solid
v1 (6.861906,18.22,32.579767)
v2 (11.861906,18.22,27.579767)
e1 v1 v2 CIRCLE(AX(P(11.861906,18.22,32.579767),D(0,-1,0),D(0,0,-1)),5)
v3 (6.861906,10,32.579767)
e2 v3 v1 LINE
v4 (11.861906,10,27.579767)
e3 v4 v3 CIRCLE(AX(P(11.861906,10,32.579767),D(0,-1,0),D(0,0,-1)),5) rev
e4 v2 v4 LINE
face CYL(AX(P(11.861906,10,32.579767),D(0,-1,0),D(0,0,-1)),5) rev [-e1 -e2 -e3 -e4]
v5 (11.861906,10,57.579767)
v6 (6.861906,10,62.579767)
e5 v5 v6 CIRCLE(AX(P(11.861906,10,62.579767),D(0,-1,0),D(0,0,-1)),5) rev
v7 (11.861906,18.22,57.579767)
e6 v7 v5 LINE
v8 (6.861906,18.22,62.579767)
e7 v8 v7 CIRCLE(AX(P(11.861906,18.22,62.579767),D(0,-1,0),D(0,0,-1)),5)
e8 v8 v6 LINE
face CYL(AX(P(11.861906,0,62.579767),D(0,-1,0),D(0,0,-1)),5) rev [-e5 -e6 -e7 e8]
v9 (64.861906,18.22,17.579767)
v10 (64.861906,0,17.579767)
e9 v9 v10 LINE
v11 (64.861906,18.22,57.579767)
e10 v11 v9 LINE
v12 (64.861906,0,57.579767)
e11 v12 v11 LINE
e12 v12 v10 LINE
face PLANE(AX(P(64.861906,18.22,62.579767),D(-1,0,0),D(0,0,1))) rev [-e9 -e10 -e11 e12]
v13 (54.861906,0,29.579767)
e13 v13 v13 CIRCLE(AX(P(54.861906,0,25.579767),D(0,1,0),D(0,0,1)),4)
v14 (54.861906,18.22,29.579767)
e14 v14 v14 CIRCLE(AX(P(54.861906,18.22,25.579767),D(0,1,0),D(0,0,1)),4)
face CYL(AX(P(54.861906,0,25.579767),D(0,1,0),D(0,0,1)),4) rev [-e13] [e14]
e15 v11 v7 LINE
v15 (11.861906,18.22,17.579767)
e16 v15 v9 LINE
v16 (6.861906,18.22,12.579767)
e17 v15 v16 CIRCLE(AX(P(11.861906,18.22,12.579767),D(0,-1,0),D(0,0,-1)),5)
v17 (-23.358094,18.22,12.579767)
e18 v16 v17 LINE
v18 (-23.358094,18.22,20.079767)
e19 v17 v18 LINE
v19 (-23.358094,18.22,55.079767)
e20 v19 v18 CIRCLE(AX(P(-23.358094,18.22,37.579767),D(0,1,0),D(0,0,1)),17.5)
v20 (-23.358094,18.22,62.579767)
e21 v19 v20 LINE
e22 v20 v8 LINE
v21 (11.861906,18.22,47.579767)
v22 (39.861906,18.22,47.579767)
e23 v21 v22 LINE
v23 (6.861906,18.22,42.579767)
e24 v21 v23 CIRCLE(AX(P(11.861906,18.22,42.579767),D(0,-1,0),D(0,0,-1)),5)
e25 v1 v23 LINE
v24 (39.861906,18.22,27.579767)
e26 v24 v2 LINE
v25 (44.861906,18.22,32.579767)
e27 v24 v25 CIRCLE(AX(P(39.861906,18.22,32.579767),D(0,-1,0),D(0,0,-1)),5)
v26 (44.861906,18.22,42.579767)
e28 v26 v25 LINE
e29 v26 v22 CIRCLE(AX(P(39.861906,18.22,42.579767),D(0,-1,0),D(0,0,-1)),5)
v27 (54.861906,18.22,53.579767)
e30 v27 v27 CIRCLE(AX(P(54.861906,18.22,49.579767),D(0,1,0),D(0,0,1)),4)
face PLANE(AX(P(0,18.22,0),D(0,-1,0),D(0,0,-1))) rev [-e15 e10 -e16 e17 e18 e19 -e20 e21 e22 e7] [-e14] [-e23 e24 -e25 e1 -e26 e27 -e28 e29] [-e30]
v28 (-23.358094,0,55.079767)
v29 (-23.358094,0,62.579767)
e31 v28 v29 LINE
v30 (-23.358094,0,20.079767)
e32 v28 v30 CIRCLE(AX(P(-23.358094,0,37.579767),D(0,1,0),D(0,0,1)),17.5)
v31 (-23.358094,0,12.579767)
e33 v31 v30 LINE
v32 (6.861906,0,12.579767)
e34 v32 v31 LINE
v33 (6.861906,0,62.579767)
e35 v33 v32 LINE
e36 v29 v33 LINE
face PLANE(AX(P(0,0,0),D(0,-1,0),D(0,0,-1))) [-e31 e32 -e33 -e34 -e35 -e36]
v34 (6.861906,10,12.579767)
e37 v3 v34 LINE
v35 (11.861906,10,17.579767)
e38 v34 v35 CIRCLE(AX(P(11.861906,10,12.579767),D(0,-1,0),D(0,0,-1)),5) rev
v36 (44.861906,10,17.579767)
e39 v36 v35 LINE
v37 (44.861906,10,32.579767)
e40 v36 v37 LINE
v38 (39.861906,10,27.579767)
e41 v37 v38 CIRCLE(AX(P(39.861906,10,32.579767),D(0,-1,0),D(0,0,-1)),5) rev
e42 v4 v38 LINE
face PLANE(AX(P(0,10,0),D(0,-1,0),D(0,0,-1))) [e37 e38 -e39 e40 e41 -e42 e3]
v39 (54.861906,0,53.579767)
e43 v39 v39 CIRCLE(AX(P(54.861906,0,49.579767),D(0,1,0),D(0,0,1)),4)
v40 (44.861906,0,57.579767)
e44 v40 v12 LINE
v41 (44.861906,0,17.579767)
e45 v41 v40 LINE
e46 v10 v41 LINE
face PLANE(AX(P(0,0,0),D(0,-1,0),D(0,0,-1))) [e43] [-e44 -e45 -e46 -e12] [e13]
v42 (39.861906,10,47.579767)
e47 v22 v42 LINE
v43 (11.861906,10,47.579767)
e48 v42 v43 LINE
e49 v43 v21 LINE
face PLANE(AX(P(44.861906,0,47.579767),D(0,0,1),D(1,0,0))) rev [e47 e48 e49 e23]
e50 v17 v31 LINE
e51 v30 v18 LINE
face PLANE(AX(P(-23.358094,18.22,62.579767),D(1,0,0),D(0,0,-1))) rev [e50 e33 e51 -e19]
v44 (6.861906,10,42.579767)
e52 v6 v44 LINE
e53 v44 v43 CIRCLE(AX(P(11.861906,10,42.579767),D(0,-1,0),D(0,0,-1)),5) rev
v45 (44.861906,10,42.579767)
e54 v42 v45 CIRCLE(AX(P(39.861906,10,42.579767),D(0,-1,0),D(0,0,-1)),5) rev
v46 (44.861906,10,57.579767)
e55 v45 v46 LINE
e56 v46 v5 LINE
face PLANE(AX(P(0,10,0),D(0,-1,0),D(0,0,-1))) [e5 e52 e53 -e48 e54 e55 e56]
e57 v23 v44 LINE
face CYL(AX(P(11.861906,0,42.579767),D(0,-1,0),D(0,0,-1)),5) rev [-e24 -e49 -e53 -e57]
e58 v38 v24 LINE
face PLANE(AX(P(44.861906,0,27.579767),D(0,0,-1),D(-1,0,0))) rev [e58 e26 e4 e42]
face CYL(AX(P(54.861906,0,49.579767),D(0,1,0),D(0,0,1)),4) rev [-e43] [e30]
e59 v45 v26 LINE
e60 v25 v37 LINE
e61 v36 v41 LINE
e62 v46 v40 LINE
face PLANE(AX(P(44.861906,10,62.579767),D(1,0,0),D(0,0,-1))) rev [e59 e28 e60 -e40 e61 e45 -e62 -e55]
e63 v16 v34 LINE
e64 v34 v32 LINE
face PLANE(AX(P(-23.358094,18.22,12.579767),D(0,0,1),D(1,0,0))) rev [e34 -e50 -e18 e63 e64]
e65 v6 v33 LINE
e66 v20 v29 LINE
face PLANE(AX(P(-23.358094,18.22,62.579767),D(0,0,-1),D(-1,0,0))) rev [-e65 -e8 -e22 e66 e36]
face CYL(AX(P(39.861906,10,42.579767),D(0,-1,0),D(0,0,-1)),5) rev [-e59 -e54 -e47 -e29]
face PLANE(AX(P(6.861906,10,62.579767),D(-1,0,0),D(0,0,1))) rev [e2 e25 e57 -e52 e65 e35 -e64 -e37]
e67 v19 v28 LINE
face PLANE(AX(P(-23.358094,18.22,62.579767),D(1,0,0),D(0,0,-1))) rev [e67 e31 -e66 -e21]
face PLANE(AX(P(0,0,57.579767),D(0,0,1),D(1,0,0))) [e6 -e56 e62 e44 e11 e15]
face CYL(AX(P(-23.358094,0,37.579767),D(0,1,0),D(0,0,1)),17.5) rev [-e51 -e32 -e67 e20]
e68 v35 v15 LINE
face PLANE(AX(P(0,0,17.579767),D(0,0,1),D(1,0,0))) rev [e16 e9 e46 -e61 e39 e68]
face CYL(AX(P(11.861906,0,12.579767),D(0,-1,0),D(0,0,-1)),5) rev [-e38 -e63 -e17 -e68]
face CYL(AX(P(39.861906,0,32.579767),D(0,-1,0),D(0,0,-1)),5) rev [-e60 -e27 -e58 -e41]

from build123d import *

# Parameters (mm, degrees)
ESQUISSE1_W             = 88.22
ESQUISSE1_H             = 50
BOSS_EXTRU_2_DEPTH      = 18.22
ESQUISSE3_W             = 38
ESQUISSE3_H             = 50
ENL_V_MAT_EXTRU_1_DEPTH = 10
ESQUISSE6_W             = 58
ESQUISSE6_H             = 18.22
ENL_V_MAT_EXTRU_2_DEPTH = 5
ESQUISSE7_W             = 58
ESQUISSE7_H             = 18.22
ENL_V_MAT_EXTRU_3_DEPTH = 5
CONG_6_R                = 5
CONG_11_R               = 5
ESQUISSE8_R             = 17.5
ENL_V_MAT_EXTRU_4_DEPTH = 92.952500984
ESQUISSE10_W            = 38
ESQUISSE10_H            = 20
ENL_V_MAT_EXTRU_5_DEPTH = 92.952500984
CONG_7_R                = 5
CONG_8_R                = 5
CONG_9_R                = 5
CONG_10_R               = 5
ESQUISSE11_R            = 4
ENL_V_MAT_EXTRU_6_DEPTH = 92.952500984


with BuildPart() as part:
    # Esquisse1 → Boss.-Extru.2 (new body)
    with BuildSketch(Plane(origin=(0, 0, 0), x_dir=(1, 0, 0), z_dir=(0, 1, 0))):
        with Locations((20.751905501, -37.579767114)):
            Rectangle(ESQUISSE1_W, ESQUISSE1_H)
    extrude(amount=BOSS_EXTRU_2_DEPTH)

    # Esquisse3 → Enlèv. mat.-Extru.1 (cut)
    with BuildSketch(Plane(origin=(0, 0, 0), x_dir=(-1, 0, 0), z_dir=(0, -1, 0))):
        with Locations((-25.861905501, -37.579767114)):
            Rectangle(ESQUISSE3_W, ESQUISSE3_H)
    extrude(amount=-ENL_V_MAT_EXTRU_1_DEPTH, mode=Mode.SUBTRACT)

    # Esquisse6 → Enlèv. mat.-Extru.2 (cut)
    with BuildSketch(Plane.XY.offset(62.579767114)):
        with Locations((35.861905501, 9.11)):
            Rectangle(ESQUISSE6_W, ESQUISSE6_H)
    extrude(amount=-ENL_V_MAT_EXTRU_2_DEPTH, mode=Mode.SUBTRACT)

    # Esquisse7 → Enlèv. mat.-Extru.3 (cut)
    with BuildSketch(Plane(origin=(0, 0, 12.579767114), x_dir=(-1, 0, 0), z_dir=(0, 0, -1))):
        with Locations((-35.861905501, 9.11)):
            Rectangle(ESQUISSE7_W, ESQUISSE7_H)
    extrude(amount=-ENL_V_MAT_EXTRU_3_DEPTH, mode=Mode.SUBTRACT)

    # Congé6
    cong_6_edges = [part.edges().sort_by_distance(p)[0] for p in [
        (6.861905501, 14.11, 17.579767114),
    ]]
    fillet(cong_6_edges, radius=CONG_6_R - 0.0001)  # a hair under: the kernel refuses the full size

    # Congé11
    cong_11_edges = [part.edges().sort_by_distance(p)[0] for p in [
        (6.861905501, 14.11, 57.579767114),
    ]]
    fillet(cong_11_edges, radius=CONG_11_R - 0.0001)  # a hair under: the kernel refuses the full size

    # Esquisse8 → Enlèv. mat.-Extru.4 (cut, through all)
    with BuildSketch(Plane(origin=(0, 18.22, 0), x_dir=(1, 0, 0), z_dir=(0, 1, 0))):
        with Locations((-23.358094499, -37.579767114)):
            Circle(ESQUISSE8_R)
    extrude(amount=-ENL_V_MAT_EXTRU_4_DEPTH, mode=Mode.SUBTRACT)

    # Esquisse10 → Enlèv. mat.-Extru.5 (cut, through all)
    with BuildSketch(Plane(origin=(0, 18.22, 0), x_dir=(1, 0, 0), z_dir=(0, 1, 0))):
        with Locations((25.861905501, -37.579767114)):
            Rectangle(ESQUISSE10_W, ESQUISSE10_H)
    extrude(amount=-ENL_V_MAT_EXTRU_5_DEPTH, mode=Mode.SUBTRACT)

    # Congé7
    cong_7_edges = [part.edges().sort_by_distance(p)[0] for p in [
        (6.861905501, 14.11, 27.579767114),
    ]]
    fillet(cong_7_edges, radius=CONG_7_R)

    # Congé8
    cong_8_edges = [part.edges().sort_by_distance(p)[0] for p in [
        (6.861905501, 14.11, 47.579767114),
    ]]
    fillet(cong_8_edges, radius=CONG_8_R)

    # Congé9
    cong_9_edges = [part.edges().sort_by_distance(p)[0] for p in [
        (44.861905501, 14.11, 27.579767114),
    ]]
    fillet(cong_9_edges, radius=CONG_9_R)

    # Congé10
    cong_10_edges = [part.edges().sort_by_distance(p)[0] for p in [
        (44.861905501, 14.11, 47.579767114),
    ]]
    fillet(cong_10_edges, radius=CONG_10_R)

    # Esquisse11 → Enlèv. mat.-Extru.6 (cut, through all)
    with BuildSketch(Plane(origin=(0, 18.22, 0), x_dir=(1, 0, 0), z_dir=(0, 1, 0))):
        with Locations(Location((54.861905501, -49.579767114, 0), (0, 0, 270))):
            Circle(ESQUISSE11_R)
        with Locations(Location((54.861905501, -25.579767114, 0), (0, 0, 270))):
            Circle(ESQUISSE11_R)
    extrude(amount=-ENL_V_MAT_EXTRU_6_DEPTH, mode=Mode.SUBTRACT)


solid = part.part
